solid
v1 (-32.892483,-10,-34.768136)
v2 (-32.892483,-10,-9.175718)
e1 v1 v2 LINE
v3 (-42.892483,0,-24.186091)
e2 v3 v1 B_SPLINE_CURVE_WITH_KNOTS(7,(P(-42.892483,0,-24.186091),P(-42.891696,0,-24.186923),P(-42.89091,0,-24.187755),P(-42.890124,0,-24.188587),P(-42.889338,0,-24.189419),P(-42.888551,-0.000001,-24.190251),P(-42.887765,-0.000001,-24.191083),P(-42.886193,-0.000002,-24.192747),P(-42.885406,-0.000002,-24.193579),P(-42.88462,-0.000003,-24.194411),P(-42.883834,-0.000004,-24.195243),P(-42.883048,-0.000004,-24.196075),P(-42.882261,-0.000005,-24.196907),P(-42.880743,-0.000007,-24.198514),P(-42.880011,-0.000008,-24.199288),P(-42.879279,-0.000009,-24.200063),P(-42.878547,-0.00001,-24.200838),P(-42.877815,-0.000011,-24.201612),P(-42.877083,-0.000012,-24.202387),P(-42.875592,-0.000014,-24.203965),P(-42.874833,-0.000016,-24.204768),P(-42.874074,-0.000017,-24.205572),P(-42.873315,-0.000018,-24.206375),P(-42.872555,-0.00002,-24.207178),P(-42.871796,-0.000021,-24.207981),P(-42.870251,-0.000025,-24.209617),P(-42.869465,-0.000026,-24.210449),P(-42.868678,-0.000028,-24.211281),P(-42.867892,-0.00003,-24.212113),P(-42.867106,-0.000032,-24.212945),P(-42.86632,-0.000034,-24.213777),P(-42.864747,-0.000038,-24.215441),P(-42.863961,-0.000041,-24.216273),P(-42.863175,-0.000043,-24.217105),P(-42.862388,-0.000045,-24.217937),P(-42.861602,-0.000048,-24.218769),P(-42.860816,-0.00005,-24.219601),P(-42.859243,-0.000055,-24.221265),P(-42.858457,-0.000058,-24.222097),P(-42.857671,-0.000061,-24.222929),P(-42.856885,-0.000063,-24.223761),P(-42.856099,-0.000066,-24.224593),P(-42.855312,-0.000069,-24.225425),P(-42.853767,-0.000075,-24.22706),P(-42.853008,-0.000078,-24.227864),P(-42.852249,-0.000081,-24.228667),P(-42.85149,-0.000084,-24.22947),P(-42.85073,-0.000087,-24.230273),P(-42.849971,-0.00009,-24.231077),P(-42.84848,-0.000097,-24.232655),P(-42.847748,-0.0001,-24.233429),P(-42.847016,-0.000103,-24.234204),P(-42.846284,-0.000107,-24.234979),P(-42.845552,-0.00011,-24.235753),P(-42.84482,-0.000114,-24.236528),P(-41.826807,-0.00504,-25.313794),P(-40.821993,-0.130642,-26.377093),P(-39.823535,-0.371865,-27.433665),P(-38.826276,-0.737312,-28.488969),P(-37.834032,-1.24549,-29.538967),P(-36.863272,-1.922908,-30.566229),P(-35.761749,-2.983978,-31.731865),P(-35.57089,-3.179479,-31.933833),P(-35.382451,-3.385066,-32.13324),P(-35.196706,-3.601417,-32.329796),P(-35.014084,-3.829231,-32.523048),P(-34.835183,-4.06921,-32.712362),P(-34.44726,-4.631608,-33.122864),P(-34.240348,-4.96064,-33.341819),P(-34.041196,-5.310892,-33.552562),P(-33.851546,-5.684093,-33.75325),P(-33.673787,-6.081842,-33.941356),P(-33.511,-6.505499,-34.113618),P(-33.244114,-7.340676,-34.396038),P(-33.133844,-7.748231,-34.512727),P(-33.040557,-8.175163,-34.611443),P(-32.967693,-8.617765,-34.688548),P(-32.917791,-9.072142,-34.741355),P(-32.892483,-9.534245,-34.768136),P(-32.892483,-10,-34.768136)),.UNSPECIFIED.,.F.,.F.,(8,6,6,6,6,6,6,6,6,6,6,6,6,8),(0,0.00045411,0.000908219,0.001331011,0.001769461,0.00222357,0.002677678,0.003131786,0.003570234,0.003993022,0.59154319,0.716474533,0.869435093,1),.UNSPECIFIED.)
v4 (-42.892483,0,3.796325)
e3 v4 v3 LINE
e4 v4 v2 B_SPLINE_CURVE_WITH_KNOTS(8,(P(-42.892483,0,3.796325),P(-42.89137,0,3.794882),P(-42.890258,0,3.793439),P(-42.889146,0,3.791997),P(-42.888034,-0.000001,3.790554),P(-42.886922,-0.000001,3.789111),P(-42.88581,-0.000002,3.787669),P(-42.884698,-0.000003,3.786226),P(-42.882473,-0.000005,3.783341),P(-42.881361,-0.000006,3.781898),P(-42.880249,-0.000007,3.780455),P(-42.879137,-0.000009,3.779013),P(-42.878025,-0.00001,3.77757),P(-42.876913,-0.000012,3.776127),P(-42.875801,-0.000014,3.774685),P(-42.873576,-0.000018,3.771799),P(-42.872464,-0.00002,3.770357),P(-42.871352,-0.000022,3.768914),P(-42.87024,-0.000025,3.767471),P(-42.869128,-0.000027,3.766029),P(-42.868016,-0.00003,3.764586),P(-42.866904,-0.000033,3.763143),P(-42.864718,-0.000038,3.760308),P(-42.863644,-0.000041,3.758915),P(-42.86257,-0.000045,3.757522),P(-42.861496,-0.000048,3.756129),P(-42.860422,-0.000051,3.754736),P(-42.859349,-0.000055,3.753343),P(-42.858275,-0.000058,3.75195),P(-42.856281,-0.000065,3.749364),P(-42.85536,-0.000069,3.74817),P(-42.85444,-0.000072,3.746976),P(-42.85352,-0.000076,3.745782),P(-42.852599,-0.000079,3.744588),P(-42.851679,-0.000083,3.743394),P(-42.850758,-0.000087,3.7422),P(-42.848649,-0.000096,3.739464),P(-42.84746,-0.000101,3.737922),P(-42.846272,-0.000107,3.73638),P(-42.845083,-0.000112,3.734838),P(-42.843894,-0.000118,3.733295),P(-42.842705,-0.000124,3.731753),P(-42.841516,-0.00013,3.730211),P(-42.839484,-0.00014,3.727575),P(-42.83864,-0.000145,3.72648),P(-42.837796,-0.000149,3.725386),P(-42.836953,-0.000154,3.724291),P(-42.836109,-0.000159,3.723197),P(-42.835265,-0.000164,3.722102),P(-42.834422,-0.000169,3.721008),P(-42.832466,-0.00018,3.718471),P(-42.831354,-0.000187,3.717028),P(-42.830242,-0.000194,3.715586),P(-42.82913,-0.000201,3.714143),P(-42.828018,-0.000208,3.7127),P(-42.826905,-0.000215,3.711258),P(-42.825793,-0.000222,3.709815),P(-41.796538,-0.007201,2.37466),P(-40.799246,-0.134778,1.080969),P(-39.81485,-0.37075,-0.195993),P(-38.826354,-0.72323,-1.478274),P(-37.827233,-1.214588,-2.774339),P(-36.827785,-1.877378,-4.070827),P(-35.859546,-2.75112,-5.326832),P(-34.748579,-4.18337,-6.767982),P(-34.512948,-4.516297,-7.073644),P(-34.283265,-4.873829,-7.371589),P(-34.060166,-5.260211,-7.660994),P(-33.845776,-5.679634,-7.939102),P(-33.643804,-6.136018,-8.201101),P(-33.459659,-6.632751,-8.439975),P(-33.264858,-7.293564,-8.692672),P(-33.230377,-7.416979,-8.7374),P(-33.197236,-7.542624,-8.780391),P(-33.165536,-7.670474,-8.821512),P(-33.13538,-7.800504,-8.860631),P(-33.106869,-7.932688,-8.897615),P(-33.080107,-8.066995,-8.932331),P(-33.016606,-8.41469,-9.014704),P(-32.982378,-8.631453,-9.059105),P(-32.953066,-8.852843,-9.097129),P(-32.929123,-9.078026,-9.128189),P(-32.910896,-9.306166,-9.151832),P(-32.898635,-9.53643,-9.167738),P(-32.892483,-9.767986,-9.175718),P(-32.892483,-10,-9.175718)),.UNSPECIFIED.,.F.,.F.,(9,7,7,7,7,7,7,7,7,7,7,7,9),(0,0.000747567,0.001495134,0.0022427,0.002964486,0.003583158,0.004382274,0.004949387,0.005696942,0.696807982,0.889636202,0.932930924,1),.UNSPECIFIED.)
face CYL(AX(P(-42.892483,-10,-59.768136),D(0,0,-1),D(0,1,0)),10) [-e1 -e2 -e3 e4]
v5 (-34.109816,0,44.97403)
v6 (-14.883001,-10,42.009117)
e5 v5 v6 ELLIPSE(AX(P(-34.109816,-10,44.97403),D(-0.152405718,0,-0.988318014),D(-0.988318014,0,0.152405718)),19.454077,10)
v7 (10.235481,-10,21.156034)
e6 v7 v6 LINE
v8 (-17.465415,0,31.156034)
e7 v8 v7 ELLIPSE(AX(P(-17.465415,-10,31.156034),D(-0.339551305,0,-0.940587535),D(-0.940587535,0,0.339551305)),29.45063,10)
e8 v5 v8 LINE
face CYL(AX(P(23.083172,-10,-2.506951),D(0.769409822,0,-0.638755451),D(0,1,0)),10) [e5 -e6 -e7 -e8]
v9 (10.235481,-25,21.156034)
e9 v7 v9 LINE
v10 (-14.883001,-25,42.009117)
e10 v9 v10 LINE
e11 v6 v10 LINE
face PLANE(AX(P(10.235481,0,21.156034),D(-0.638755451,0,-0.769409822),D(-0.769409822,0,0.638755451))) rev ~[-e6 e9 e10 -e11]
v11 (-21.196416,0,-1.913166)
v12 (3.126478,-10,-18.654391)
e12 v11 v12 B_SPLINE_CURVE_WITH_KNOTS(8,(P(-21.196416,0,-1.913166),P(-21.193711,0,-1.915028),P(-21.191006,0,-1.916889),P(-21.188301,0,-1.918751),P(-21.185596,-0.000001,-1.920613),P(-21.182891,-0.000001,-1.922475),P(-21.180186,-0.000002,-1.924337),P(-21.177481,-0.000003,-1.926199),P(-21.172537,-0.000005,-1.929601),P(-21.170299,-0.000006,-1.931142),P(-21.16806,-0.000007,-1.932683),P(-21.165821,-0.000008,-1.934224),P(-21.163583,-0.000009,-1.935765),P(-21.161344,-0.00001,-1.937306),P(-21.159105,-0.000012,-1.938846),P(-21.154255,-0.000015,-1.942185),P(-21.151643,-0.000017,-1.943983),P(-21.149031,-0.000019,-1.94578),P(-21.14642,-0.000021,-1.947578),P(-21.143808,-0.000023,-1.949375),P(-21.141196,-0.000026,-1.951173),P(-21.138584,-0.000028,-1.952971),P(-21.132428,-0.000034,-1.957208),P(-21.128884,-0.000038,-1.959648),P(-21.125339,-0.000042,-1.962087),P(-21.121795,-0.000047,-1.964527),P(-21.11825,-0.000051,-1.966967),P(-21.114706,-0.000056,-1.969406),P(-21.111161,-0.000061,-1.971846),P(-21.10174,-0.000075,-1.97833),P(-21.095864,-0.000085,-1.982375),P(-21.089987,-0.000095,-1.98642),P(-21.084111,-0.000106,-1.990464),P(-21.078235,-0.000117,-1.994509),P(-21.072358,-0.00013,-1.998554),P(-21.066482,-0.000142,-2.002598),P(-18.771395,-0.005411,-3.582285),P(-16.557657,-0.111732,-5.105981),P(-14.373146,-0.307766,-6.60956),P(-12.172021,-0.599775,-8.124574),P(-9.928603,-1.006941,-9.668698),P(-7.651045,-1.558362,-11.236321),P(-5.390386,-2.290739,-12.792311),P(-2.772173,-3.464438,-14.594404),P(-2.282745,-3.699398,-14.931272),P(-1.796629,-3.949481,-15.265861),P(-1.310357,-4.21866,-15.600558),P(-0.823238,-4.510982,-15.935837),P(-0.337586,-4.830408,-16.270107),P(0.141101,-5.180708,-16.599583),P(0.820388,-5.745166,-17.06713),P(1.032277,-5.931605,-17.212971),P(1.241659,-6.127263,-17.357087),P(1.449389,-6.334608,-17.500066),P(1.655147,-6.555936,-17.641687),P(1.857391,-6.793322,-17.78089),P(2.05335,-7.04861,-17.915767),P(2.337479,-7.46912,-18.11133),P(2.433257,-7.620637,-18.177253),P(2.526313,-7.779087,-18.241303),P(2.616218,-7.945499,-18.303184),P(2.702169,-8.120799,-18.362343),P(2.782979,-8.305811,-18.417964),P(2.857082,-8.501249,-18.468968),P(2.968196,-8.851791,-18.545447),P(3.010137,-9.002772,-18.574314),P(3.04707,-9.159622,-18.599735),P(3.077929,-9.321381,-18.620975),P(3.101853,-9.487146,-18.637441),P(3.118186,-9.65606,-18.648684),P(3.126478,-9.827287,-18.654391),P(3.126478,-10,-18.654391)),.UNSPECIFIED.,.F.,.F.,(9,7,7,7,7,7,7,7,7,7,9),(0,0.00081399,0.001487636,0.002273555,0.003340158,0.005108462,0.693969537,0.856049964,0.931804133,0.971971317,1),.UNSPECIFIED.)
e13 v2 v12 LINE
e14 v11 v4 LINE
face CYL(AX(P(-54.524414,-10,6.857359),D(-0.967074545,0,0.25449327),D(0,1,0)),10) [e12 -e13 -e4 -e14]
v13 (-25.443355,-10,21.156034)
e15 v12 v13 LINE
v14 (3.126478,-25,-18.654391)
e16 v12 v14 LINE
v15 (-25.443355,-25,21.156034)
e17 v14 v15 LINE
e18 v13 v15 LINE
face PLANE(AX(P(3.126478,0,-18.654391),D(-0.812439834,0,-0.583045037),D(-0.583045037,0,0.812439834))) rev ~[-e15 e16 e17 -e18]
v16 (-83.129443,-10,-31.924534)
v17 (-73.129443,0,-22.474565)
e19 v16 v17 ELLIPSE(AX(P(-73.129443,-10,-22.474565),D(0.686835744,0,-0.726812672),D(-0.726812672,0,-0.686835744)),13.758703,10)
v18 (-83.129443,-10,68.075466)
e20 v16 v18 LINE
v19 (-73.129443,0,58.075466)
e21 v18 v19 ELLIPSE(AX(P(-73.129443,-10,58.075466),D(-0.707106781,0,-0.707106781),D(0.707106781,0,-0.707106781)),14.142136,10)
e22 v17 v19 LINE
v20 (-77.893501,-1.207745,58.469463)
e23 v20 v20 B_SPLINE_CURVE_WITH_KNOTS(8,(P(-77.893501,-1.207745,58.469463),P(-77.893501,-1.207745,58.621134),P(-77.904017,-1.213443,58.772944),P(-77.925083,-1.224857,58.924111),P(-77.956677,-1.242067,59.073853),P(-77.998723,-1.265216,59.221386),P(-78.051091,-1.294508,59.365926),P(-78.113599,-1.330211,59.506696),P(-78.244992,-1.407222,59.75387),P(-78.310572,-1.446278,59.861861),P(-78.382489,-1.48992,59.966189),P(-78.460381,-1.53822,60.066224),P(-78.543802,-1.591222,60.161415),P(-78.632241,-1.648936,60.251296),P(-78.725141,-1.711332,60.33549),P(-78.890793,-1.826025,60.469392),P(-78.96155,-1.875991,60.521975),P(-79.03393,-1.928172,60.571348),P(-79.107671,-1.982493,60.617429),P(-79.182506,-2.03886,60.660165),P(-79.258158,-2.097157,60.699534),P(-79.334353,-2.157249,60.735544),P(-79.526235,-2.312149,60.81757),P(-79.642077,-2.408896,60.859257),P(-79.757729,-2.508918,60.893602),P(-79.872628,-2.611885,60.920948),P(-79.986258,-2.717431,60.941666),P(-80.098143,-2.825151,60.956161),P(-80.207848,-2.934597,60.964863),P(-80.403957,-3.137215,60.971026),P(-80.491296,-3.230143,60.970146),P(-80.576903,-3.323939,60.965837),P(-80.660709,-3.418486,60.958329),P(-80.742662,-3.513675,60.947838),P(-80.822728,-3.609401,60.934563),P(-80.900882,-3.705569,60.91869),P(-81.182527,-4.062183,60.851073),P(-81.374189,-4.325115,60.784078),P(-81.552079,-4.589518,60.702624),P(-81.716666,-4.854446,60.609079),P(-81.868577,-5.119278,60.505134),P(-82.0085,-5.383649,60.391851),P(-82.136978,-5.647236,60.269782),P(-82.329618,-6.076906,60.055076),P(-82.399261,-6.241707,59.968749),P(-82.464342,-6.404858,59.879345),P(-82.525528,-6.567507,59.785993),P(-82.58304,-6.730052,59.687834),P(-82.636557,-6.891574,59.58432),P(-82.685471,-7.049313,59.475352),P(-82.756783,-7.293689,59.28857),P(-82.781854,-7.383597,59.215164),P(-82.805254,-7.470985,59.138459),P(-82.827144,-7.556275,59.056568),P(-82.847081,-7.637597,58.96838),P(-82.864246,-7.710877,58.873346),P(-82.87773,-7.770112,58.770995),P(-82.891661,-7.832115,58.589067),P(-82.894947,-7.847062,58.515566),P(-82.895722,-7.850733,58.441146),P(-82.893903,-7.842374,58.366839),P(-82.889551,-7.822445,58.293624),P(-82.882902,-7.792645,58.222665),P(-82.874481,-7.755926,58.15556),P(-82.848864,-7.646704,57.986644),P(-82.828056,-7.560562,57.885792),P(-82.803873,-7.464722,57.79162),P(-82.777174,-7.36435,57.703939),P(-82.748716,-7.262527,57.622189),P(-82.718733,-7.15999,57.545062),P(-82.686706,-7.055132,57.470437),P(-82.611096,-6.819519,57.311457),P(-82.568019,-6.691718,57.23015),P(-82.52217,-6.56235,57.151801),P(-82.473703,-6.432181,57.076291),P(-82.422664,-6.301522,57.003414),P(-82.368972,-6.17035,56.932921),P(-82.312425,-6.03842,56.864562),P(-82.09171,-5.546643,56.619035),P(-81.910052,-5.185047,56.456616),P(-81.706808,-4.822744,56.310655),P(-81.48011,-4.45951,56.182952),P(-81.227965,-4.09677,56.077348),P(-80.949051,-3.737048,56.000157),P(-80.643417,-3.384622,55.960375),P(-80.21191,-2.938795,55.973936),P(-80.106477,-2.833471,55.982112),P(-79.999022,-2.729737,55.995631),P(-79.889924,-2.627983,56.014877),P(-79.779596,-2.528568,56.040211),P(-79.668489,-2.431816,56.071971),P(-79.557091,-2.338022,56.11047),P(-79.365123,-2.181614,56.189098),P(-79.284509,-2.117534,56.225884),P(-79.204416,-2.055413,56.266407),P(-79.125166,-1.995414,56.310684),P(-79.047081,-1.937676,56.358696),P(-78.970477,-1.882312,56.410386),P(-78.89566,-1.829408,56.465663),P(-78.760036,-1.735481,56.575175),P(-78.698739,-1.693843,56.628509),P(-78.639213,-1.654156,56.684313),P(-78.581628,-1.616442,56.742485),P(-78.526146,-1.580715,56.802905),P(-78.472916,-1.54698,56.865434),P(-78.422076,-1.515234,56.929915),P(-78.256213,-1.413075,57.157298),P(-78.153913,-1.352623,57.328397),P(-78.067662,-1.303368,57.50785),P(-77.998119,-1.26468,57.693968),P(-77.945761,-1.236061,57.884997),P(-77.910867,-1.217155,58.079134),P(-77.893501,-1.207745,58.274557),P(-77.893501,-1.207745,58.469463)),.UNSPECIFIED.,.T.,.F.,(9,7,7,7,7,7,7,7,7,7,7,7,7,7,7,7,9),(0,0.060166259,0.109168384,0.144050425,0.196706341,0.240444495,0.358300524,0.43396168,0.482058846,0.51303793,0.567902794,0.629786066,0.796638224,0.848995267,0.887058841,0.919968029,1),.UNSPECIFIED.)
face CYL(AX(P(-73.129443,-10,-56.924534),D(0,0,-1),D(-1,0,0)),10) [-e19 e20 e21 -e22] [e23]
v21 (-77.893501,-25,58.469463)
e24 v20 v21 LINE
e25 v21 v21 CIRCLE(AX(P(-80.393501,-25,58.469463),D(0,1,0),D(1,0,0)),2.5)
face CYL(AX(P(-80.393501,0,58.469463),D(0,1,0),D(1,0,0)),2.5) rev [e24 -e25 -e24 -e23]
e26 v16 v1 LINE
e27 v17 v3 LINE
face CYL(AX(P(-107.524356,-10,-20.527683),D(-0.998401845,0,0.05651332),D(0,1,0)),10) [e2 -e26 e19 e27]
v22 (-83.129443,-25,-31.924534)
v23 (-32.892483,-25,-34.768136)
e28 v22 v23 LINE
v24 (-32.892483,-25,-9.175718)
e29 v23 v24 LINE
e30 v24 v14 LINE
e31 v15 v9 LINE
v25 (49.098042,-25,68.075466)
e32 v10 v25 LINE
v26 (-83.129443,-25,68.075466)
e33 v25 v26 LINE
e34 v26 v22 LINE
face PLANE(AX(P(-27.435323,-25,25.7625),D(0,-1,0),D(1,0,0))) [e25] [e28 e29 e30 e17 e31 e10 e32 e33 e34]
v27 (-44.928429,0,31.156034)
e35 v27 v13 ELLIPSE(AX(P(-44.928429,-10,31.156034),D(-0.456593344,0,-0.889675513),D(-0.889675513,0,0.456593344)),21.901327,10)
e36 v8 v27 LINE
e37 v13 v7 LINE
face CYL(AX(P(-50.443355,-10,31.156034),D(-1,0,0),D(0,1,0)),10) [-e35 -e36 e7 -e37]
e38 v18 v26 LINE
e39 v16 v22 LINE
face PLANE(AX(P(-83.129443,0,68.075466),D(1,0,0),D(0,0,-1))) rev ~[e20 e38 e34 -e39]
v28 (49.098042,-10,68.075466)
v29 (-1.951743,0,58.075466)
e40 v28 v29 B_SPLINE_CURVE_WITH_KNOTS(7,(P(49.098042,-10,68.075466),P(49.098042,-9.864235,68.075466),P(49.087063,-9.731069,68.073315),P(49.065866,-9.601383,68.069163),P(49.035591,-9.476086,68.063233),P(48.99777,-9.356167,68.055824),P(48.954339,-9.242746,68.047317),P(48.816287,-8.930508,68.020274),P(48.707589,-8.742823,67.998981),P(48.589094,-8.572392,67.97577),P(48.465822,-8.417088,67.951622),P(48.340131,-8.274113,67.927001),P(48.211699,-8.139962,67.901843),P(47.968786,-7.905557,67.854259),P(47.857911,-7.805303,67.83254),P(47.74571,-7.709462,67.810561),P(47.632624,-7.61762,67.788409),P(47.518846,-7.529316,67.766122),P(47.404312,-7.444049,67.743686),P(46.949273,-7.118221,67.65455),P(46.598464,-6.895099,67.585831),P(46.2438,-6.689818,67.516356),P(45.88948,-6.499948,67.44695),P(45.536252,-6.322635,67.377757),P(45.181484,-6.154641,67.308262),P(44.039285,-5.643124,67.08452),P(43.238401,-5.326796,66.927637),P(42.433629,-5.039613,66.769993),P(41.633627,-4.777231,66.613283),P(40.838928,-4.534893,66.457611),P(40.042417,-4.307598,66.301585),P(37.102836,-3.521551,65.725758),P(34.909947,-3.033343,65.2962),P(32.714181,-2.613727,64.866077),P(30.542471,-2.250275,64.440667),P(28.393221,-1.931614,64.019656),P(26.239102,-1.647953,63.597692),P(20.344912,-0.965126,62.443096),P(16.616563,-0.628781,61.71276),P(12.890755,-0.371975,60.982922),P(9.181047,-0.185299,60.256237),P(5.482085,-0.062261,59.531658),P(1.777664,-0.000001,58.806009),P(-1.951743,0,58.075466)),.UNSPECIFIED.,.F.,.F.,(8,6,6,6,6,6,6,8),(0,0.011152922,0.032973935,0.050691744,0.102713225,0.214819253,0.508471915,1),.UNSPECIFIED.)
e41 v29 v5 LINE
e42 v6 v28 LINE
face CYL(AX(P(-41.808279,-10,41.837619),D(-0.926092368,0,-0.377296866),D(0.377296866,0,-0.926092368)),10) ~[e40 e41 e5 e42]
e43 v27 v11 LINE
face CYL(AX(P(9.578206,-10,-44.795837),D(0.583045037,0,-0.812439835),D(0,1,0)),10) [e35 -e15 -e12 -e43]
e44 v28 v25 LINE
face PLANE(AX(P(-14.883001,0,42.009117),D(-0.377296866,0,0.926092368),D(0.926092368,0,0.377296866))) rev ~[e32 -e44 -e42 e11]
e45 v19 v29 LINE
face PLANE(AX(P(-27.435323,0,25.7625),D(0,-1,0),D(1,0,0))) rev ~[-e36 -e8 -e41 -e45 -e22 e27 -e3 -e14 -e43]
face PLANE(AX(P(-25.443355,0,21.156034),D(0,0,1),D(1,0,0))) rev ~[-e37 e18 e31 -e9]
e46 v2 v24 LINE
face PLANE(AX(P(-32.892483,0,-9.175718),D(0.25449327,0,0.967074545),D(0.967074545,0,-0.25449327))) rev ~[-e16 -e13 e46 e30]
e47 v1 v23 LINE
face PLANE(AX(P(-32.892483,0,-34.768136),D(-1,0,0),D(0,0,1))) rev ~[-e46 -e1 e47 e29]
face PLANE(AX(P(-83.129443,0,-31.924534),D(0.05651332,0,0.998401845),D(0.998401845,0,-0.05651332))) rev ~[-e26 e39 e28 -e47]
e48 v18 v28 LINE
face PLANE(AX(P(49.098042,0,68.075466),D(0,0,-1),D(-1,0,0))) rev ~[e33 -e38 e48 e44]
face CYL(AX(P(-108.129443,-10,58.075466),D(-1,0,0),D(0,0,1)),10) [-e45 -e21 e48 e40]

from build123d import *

# Parameters (mm, degrees)
F1_DEPTH     = 25
F2_R         = 2.5
F3_DEPTH     = 46.9
F4_T1_DEPTH  = 150
F4_T3_DEPTH  = 182.2274848408
F4_T5_DEPTH  = 100.3173754326
F4_T10_DEPTH = 75.5924176596
F4_T15_DEPTH = 87.245278787
F4_T20_DEPTH = 99.0010747165
F4_T25_DEPTH = 85.6788355908
F4_T30_DEPTH = 82.646426835
F4_T35_DEPTH = 119.0871070802
F4_T41_DEPTH = 75.5924176596
F4_T45_DEPTH = 87.245278787
F4_T52_DEPTH = 85.6788355908
F4_T56_DEPTH = 99.0010747165
F4_T63_DEPTH = 119.0871070802
F4_T67_DEPTH = 82.646426835


# Not quite as in the source:
# - a fillet or chamfer that OpenCascade refuses, or shapes differently, is made with other operations: its cross-section is extruded or revolved along the edge and cut away or added


with BuildPart() as f1:
    # F0 (on Front) → F1 (new body)
    with BuildSketch(Plane.XZ):
        Polygon((49.0980417262, 68.0754659733), (-83.1294431146, 68.0754659733), (-83.1294431146, -31.9245340267), (-32.8924826343, -34.7681359889), (-32.8924826343, -9.1757183293), (3.1264783981, -18.6543911301), (-25.4433550304, 21.1560339021), (10.2354805604, 21.1560339021), (-14.8830008989, 42.00911699), align=None)
    extrude(amount=F1_DEPTH)

    # F2 (on Front) → F3 (cut)
    with BuildSketch(Plane.XZ):
        with Locations((-80.3935006261, 58.4694631398)):
            Circle(F2_R)
    extrude(amount=F3_DEPTH, mode=Mode.SUBTRACT)

    # F4: fillet of radius 10 on 9 edges, made by hand

    # F4_s2 → F4_t1 (cut)
    with BuildSketch(Plane.XY.offset(-56.9245340267)):
        with BuildLine():
            ThreePointArc((-83.1294431146, -10), (-80.2005109264, -2.9289321881), (-73.1294431146, 0))
            Line((-73.1294431146, 0), (-83.1294431146, 0))
            Line((-83.1294431146, 0), (-83.1294431146, -10))
        make_face()
    extrude(amount=F4_T1_DEPTH, mode=Mode.SUBTRACT)

    # F4_s4 → F4_t3 (cut)
    with BuildSketch(Plane.YZ.offset(-108.1294431146)):
        with BuildLine():
            ThreePointArc((-10, 68.0754659733), (-2.9289321881, 65.1465337851), (0, 58.0754659733))
            Line((0, 58.0754659733), (0, 68.0754659733))
            Line((0, 68.0754659733), (-10, 68.0754659733))
        make_face()
    extrude(amount=F4_T3_DEPTH, mode=Mode.SUBTRACT)

    # F4_s6 → F4_t5 (cut)
    with BuildSketch(Plane(origin=(-106.0227160465, 0, 6.0012867121), x_dir=(0, 1, 0), z_dir=(0.9984018453, 0, -0.0565133205))):
        with BuildLine():
            ThreePointArc((0, -26.5714345391), (-2.9289321881, -33.6425023509), (-10, -36.5714345391))
            Line((-10, -36.5714345391), (0, -36.5714345391))
            Line((0, -36.5714345391), (0, -26.5714345391))
        make_face()
    extrude(amount=F4_T5_DEPTH, mode=Mode.SUBTRACT)


with BuildPart() as f4_tool8:
    # F4_s9 → F4_t10 (new body)
    with BuildSketch(Plane.XY.offset(-59.7681359889)):
        with BuildLine():
            ThreePointArc((-42.8924826343, 0), (-35.8214148224, -2.9289321881), (-32.8924826343, -10))
            Line((-32.8924826343, -10), (-32.8924826343, 0))
            Line((-32.8924826343, 0), (-42.8924826343, 0))
        make_face()
    extrude(amount=F4_T10_DEPTH)

    split(bisect_by=Plane(origin=(-4.3886140602, 0, -16.676735461), x_dir=(0, 1, 0), z_dir=(-0.2544932703, 0, -0.9670745449)), keep=Keep.TOP)


with BuildPart() as f1_1:
    add(f1.part)

    # F4_t7: cut F4_tool8
    add(f4_tool8.part, mode=Mode.SUBTRACT)


with BuildPart() as f4_tool13:
    # F4_s14 → F4_t15 (new body)
    with BuildSketch(Plane(origin=(-52.6807321964, 0, 13.8633488887), x_dir=(0, 1, 0), z_dir=(0.9670745449, 0, -0.2544932703))):
        with BuildLine():
            ThreePointArc((0, -7.2445191005), (-2.9289321881, -14.3155869123), (-10, -17.2445191005))
            Line((-10, -17.2445191005), (0, -17.2445191005))
            Line((0, -17.2445191005), (0, -7.2445191005))
        make_face()
    extrude(amount=F4_T15_DEPTH)

    split(bisect_by=Plane.YZ.offset(-32.8924826343), keep=Keep.TOP)


with BuildPart() as f1_2:
    add(f1_1.part)

    # F4_t12: cut F4_tool13
    add(f4_tool13.part, mode=Mode.SUBTRACT)


with BuildPart() as f4_tool18:
    # F4_s19 → F4_t20 (new body)
    with BuildSketch(Plane(origin=(24.4753258646, 0, -34.1049634717), x_dir=(0, 1, 0), z_dir=(-0.5830450371, 0, 0.8124398345))):
        with BuildLine():
            ThreePointArc((0, 18.3362745772), (-2.9289321881, 11.2652067653), (-10, 8.3362745772))
            Line((-10, 8.3362745772), (0, 8.3362745772))
            Line((0, 8.3362745772), (0, 18.3362745772))
        make_face()
    extrude(amount=F4_T20_DEPTH)

    split(bisect_by=Plane.XY.offset(21.1560339021), keep=Keep.BOTTOM)


with BuildPart() as f1_3:
    add(f1_2.part)

    # F4_t17: cut F4_tool18
    add(f4_tool18.part, mode=Mode.SUBTRACT)


with BuildPart() as f4_tool23:
    # F4_s24 → F4_t25 (new body)
    with BuildSketch(Plane.YZ.offset(-50.4433550304)):
        with BuildLine():
            ThreePointArc((0, 31.1560339021), (-2.9289321881, 24.0849660902), (-10, 21.1560339021))
            Line((-10, 21.1560339021), (0, 21.1560339021))
            Line((0, 21.1560339021), (0, 31.1560339021))
        make_face()
    extrude(amount=F4_T25_DEPTH)

    split(bisect_by=Plane(origin=(-6.7727215377, 0, -4.8604235206), x_dir=(0, 1, 0), z_dir=(0.8124398345, 0, 0.5830450371)), keep=Keep.TOP)


with BuildPart() as f1_4:
    add(f1_3.part)

    # F4_t22: cut F4_tool23
    add(f4_tool23.part, mode=Mode.SUBTRACT)


with BuildPart() as f4_tool28:
    # F4_s29 → F4_t30 (new body)
    with BuildSketch(Plane(origin=(14.897118547, 0, -12.3674216268), x_dir=(0, 1, 0), z_dir=(-0.769409822, 0, 0.6387554507))):
        with BuildLine():
            ThreePointArc((0, -12.8156292772), (-2.9289321881, -19.8866970891), (-10, -22.8156292772))
            Line((-10, -22.8156292772), (0, -22.8156292772))
            Line((0, -22.8156292772), (0, -12.8156292772))
        make_face()
    extrude(amount=F4_T30_DEPTH)

    split(bisect_by=Plane(origin=(-16.7971177223, 0, 41.2292916688), x_dir=(0, 1, 0), z_dir=(0.377296866, 0, -0.9260923684)), keep=Keep.TOP)


with BuildPart() as f1_5:
    add(f1_4.part)

    # F4_t27: cut F4_tool28
    add(f4_tool28.part, mode=Mode.SUBTRACT)


with BuildPart() as f4_tool33:
    # F4_s34 → F4_t35 (new body)
    with BuildSketch(Plane(origin=(-21.2381923878, 0, -8.6525963291), x_dir=(0, 1, 0), z_dir=(0.9260923684, 0, 0.377296866))):
        with BuildLine():
            ThreePointArc((-10, 44.5196322457), (-2.9289321881, 47.4485644338), (0, 54.5196322457))
            Line((0, 54.5196322457), (0, 44.5196322457))
            Line((0, 44.5196322457), (-10, 44.5196322457))
        make_face()
    extrude(amount=F4_T35_DEPTH)

    split(bisect_by=Plane(origin=(14.5736075628, 0, 17.5545692605), x_dir=(0, 1, 0), z_dir=(0.6387554507, 0, 0.769409822)), keep=Keep.TOP)


with BuildPart() as f1_6:
    add(f1_5.part)

    # F4_t32: cut F4_tool33
    add(f4_tool33.part, mode=Mode.SUBTRACT)


with BuildPart() as f4_tool39:
    # F4_s40 → F4_t41 (new body)
    with BuildSketch(Plane.XY.offset(-59.7681359889)):
        with BuildLine():
            ThreePointArc((-42.8924826343, 0), (-35.8214148224, -2.9289321881), (-32.8924826343, -10))
            Line((-32.8924826343, -10), (-32.8924826343, 0))
            Line((-32.8924826343, 0), (-42.8924826343, 0))
        make_face()
    extrude(amount=F4_T41_DEPTH)

    split(bisect_by=Plane(origin=(-4.3886140602, 0, -16.676735461), x_dir=(0, 1, 0), z_dir=(0.2544932703, 0, 0.9670745449)), keep=Keep.TOP)


with BuildPart() as f4_tool43:
    # F4_s44 → F4_t45 (new body)
    with BuildSketch(Plane(origin=(-52.6807321964, 0, 13.8633488887), x_dir=(0, 1, 0), z_dir=(0.9670745449, 0, -0.2544932703))):
        with BuildLine():
            ThreePointArc((0, -7.2445191005), (-2.9289321881, -14.3155869123), (-10, -17.2445191005))
            Line((-10, -17.2445191005), (0, -17.2445191005))
            Line((0, -17.2445191005), (0, -7.2445191005))
        make_face()
    extrude(amount=F4_T45_DEPTH)

    split(bisect_by=Plane.YZ.offset(-32.8924826343), keep=Keep.BOTTOM)


with BuildPart() as f4_tool39_1:
    add(f4_tool39.part)

    # F4_t47: intersect F4_tool43
    add(f4_tool43.part, mode=Mode.INTERSECT)


with BuildPart() as f1_7:
    add(f1_6.part)

    # F4_t37: cut F4_tool39
    add(f4_tool39_1.part, mode=Mode.SUBTRACT)


with BuildPart() as f4_tool50:
    # F4_s51 → F4_t52 (new body)
    with BuildSketch(Plane.YZ.offset(-50.4433550304)):
        with BuildLine():
            ThreePointArc((0, 31.1560339021), (-2.9289321881, 24.0849660902), (-10, 21.1560339021))
            Line((-10, 21.1560339021), (0, 21.1560339021))
            Line((0, 21.1560339021), (0, 31.1560339021))
        make_face()
    extrude(amount=F4_T52_DEPTH)

    split(bisect_by=Plane(origin=(-6.7727215377, 0, -4.8604235206), x_dir=(0, 1, 0), z_dir=(-0.8124398345, 0, -0.5830450371)), keep=Keep.TOP)


with BuildPart() as f4_tool54:
    # F4_s55 → F4_t56 (new body)
    with BuildSketch(Plane(origin=(24.4753258646, 0, -34.1049634717), x_dir=(0, 1, 0), z_dir=(-0.5830450371, 0, 0.8124398345))):
        with BuildLine():
            ThreePointArc((0, 18.3362745772), (-2.9289321881, 11.2652067653), (-10, 8.3362745772))
            Line((-10, 8.3362745772), (0, 8.3362745772))
            Line((0, 8.3362745772), (0, 18.3362745772))
        make_face()
    extrude(amount=F4_T56_DEPTH)

    split(bisect_by=Plane.XY.offset(21.1560339021), keep=Keep.TOP)


with BuildPart() as f4_tool50_1:
    add(f4_tool50.part)

    # F4_t58: intersect F4_tool54
    add(f4_tool54.part, mode=Mode.INTERSECT)


with BuildPart() as f1_8:
    add(f1_7.part)

    # F4_t48: cut F4_tool50
    add(f4_tool50_1.part, mode=Mode.SUBTRACT)


with BuildPart() as f4_tool61:
    # F4_s62 → F4_t63 (new body)
    with BuildSketch(Plane(origin=(-21.2381923878, 0, -8.6525963291), x_dir=(0, 1, 0), z_dir=(0.9260923684, 0, 0.377296866))):
        with BuildLine():
            ThreePointArc((-10, 44.5196322457), (-2.9289321881, 47.4485644338), (0, 54.5196322457))
            Line((0, 54.5196322457), (0, 44.5196322457))
            Line((0, 44.5196322457), (-10, 44.5196322457))
        make_face()
    extrude(amount=F4_T63_DEPTH)

    split(bisect_by=Plane(origin=(14.5736075628, 0, 17.5545692605), x_dir=(0, 1, 0), z_dir=(-0.6387554507, 0, -0.769409822)), keep=Keep.TOP)


with BuildPart() as f4_tool65:
    # F4_s66 → F4_t67 (new body)
    with BuildSketch(Plane(origin=(14.897118547, 0, -12.3674216268), x_dir=(0, 1, 0), z_dir=(-0.769409822, 0, 0.6387554507))):
        with BuildLine():
            ThreePointArc((0, -12.8156292772), (-2.9289321881, -19.8866970891), (-10, -22.8156292772))
            Line((-10, -22.8156292772), (0, -22.8156292772))
            Line((0, -22.8156292772), (0, -12.8156292772))
        make_face()
    extrude(amount=F4_T67_DEPTH)

    split(bisect_by=Plane(origin=(-16.7971177223, 0, 41.2292916688), x_dir=(0, 1, 0), z_dir=(-0.377296866, 0, 0.9260923684)), keep=Keep.TOP)


with BuildPart() as f4_tool61_1:
    add(f4_tool61.part)

    # F4_t69: intersect F4_tool65
    add(f4_tool65.part, mode=Mode.INTERSECT)


with BuildPart() as f1_9:
    add(f1_8.part)

    # F4_t59: cut F4_tool61
    add(f4_tool61_1.part, mode=Mode.SUBTRACT)


solid = f1_9.part
